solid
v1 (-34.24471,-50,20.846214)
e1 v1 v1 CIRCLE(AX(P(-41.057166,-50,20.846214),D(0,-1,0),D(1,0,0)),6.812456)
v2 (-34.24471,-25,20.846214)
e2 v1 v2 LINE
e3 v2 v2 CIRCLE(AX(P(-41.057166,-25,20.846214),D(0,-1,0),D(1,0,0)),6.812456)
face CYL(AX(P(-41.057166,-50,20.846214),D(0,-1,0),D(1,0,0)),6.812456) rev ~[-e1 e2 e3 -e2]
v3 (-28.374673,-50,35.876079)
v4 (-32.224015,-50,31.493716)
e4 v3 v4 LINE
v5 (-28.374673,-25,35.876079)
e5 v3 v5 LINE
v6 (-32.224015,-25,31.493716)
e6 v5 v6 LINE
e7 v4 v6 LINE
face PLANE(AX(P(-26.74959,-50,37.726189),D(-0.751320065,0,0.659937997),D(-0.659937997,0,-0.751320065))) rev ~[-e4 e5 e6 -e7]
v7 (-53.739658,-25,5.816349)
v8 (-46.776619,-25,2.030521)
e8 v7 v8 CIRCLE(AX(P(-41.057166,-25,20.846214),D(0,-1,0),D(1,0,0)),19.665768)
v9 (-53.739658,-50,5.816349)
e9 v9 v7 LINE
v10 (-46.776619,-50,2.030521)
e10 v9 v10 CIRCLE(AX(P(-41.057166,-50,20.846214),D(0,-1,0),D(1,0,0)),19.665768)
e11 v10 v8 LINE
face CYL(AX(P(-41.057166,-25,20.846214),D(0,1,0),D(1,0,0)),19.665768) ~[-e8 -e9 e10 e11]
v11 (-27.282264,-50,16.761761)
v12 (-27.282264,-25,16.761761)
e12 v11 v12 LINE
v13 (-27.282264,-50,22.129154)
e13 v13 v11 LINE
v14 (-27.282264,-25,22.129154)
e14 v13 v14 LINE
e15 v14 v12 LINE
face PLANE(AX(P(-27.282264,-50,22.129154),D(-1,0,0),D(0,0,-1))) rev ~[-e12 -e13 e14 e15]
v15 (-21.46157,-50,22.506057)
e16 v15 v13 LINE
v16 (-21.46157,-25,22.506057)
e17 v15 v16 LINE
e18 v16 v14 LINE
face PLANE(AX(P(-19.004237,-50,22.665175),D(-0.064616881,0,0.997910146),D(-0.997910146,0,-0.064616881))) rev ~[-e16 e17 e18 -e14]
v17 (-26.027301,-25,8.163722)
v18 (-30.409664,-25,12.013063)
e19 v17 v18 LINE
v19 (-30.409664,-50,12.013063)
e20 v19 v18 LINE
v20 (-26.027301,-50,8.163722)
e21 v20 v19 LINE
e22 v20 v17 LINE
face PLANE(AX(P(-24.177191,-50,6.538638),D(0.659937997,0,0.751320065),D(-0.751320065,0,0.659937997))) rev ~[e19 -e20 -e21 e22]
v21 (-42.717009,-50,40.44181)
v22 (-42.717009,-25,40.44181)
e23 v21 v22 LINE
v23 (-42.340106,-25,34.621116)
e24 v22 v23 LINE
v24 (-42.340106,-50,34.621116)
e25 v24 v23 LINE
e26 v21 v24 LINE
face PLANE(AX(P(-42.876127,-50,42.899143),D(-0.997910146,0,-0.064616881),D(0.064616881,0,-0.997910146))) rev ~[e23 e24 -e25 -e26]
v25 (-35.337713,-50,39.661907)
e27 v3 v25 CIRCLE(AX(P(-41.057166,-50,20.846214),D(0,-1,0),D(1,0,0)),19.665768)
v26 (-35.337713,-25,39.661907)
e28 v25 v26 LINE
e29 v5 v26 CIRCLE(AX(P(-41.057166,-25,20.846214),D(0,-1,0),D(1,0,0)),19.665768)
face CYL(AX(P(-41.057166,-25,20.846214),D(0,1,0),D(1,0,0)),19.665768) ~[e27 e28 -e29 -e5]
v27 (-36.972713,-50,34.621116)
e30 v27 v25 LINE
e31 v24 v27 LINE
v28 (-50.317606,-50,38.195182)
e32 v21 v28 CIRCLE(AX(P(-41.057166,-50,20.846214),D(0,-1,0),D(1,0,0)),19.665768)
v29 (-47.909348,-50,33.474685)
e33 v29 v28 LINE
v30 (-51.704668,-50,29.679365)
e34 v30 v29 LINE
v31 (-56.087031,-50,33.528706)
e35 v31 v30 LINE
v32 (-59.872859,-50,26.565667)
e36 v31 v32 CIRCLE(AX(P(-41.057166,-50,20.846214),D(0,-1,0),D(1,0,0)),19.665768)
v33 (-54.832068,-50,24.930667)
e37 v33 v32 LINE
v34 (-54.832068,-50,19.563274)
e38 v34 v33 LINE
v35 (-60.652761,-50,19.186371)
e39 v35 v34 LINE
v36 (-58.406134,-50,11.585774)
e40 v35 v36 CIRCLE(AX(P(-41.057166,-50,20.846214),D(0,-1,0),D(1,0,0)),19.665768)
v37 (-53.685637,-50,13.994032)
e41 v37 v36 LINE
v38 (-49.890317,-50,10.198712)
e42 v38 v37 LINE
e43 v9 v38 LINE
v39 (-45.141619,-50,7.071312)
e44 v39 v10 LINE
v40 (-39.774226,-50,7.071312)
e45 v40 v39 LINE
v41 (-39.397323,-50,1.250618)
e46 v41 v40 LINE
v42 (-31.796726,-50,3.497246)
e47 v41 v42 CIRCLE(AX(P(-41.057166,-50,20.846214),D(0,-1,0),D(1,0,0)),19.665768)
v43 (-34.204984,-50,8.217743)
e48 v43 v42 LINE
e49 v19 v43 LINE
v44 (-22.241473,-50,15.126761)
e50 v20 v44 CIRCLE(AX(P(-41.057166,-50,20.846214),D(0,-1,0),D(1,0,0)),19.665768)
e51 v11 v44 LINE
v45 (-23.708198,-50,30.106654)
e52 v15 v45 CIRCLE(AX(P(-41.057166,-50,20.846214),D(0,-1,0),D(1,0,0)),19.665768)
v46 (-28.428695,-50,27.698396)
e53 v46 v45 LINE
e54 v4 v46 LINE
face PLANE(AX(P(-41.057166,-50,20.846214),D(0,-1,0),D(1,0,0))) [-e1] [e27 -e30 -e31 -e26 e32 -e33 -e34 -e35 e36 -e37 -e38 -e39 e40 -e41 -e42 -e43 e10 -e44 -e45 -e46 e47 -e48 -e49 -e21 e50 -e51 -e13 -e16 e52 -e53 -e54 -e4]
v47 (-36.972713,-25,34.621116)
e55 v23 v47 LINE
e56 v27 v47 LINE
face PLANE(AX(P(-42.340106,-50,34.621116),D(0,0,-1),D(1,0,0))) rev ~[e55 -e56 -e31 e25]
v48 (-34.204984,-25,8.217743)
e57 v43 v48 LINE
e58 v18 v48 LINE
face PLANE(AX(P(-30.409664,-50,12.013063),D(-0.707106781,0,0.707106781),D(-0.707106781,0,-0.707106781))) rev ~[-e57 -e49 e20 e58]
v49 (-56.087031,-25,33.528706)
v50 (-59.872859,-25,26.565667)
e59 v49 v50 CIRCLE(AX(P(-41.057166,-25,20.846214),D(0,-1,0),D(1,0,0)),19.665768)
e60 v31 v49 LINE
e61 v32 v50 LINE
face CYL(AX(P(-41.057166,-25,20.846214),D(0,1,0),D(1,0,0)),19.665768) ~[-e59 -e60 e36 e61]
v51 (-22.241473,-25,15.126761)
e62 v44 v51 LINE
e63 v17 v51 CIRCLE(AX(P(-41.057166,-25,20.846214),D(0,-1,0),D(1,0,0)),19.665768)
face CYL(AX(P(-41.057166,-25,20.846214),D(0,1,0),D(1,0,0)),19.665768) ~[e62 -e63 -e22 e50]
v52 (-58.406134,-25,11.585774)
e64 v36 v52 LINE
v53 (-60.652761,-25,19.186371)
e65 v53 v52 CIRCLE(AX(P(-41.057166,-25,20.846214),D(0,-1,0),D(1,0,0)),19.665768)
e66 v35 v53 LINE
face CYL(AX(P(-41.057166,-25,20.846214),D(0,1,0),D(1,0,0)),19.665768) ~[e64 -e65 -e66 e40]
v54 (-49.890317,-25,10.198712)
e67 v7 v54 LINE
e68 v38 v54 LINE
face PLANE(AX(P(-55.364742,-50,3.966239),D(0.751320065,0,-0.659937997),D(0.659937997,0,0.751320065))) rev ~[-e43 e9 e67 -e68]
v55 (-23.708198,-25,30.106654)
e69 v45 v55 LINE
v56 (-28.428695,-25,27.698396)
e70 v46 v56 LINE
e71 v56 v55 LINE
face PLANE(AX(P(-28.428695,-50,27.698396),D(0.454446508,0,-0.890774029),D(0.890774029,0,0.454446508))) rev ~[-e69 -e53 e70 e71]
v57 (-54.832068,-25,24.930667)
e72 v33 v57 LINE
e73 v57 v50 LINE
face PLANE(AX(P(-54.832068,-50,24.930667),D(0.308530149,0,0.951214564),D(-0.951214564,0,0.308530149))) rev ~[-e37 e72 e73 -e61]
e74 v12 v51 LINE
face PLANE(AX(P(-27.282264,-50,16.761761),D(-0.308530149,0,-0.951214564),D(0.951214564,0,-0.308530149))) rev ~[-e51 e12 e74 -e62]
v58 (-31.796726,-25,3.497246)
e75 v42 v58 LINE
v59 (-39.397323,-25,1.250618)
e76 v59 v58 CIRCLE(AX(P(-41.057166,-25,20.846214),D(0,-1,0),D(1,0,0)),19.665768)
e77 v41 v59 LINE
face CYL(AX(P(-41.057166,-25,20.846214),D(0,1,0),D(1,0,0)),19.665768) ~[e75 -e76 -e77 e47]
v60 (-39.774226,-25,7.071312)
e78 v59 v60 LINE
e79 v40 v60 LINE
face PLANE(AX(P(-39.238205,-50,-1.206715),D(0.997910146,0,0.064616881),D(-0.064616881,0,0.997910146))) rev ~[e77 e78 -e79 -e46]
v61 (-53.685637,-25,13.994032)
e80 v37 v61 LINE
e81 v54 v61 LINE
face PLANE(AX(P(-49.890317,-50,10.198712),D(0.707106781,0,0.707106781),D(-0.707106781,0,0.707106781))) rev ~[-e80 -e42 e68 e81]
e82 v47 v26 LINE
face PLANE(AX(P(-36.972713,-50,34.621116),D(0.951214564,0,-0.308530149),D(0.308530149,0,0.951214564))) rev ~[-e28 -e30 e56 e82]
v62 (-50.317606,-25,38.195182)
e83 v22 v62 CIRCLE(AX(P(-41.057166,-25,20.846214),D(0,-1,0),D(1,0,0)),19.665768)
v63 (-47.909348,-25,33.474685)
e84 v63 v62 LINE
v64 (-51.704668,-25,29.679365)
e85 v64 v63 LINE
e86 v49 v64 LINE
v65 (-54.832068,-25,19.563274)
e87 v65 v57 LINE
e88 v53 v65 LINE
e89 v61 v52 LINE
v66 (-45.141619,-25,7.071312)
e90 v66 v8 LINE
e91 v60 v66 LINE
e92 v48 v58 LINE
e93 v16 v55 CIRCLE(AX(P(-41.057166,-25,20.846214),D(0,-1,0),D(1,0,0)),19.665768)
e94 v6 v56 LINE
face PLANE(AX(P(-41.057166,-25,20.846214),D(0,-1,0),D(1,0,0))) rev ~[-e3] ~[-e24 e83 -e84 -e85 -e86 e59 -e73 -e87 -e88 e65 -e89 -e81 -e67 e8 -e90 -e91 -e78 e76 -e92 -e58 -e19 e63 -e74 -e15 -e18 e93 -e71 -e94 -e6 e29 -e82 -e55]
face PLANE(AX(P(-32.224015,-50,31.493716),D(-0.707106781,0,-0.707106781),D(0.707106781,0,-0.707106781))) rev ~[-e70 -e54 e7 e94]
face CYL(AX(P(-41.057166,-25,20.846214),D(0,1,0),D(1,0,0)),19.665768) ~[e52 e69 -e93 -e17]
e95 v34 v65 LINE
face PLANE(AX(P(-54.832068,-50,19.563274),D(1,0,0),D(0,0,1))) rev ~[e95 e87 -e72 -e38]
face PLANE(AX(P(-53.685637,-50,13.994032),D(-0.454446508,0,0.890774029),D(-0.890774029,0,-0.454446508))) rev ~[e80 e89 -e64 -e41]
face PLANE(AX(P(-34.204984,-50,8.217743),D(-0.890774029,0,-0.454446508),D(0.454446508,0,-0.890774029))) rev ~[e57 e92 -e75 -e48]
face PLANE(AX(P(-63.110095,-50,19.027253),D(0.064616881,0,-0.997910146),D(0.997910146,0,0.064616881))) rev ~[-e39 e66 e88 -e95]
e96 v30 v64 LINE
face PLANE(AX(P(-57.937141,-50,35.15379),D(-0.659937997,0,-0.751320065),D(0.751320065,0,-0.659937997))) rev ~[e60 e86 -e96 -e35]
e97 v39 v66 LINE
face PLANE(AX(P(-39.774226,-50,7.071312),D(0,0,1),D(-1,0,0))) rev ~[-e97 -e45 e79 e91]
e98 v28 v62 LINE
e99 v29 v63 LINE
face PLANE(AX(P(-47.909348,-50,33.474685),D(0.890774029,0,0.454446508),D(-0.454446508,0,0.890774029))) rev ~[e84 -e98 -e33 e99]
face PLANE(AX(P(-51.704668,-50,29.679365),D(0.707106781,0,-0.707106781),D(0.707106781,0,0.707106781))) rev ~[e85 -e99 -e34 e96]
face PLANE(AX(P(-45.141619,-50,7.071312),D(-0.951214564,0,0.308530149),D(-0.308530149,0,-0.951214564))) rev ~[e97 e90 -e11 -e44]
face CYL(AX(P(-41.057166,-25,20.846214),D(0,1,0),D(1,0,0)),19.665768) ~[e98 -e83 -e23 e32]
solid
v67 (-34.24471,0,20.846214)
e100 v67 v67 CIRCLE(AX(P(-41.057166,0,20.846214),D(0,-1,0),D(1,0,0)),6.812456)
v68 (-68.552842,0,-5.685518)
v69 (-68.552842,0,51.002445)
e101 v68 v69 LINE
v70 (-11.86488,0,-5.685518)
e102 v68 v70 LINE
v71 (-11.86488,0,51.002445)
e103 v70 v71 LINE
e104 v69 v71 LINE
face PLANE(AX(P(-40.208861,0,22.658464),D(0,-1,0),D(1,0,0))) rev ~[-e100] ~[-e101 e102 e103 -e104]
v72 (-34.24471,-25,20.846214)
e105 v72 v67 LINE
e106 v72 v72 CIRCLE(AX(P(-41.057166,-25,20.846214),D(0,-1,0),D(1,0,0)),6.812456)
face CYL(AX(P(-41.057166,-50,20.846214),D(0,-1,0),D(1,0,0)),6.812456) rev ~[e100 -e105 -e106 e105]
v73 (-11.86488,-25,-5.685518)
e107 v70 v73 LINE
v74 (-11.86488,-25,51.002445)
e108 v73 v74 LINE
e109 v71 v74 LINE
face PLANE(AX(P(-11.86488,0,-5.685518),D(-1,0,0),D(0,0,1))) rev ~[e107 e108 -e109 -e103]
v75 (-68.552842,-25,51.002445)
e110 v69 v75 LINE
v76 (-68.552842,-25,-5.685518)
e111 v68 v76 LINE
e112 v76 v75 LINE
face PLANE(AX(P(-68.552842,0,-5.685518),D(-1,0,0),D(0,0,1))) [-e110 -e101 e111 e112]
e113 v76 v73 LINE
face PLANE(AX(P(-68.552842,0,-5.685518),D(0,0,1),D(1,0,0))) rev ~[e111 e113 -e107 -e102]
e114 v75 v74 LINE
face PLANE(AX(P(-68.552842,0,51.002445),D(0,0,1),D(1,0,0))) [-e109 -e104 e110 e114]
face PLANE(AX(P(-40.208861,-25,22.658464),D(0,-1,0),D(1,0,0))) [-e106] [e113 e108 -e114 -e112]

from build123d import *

# Parameters (mm, degrees)
F0_W            = 56.6879622638
F0_H            = 56.6879622638
F1_DEPTH        = 25
F2_R            = 19.6657684011
F3_DEPTH        = 25
F4_R            = 6.8124557353
F5_DEPTH        = 50.001
F7_DEPTH        = 50.001
F7_COPIES_COUNT = 8


# Not quite as in the source:
# - a pattern or mirror of a feature is missing from the dataset's text; its kind, count and spacing are read off the source's solid


with BuildPart() as f1:
    # F0 (on Front) → F1 (new body)
    with BuildSketch(Plane.XZ):
        with Locations((-40.2088612318, 22.6584635675)):
            Rectangle(F0_W, F0_H)
    extrude(amount=F1_DEPTH)


with BuildPart() as f3:
    # F2 (on face) → F3 (new body)
    with BuildSketch(Plane.XZ.offset(25)):
        with Locations((-41.0571657121, 20.8462141454)):
            Circle(F2_R)
    extrude(amount=F3_DEPTH)


with BuildPart() as f5_tool:
    # F4 (on face) → F5 (new body, through all)
    with BuildSketch(Plane.XZ.offset(50)):
        with Locations((-41.0571657121, 20.8462141454)):
            Circle(F4_R)
    extrude(amount=-F5_DEPTH)


with BuildPart() as f1_1:
    add(f1.part)

    # F5: cut by f5_tool
    add(f5_tool.part, mode=Mode.SUBTRACT)


with BuildPart() as f3_1:
    add(f3.part)

    # F5: cut by f5_tool
    add(f5_tool.part, mode=Mode.SUBTRACT)

    # F6 (on face) → F7 (cut, through all)
    with BuildSketch(Plane.XZ.offset(50)):
        Polygon((-19.0042369068, 22.665174678), (-27.28226409, 22.1291541798), (-27.28226409, 16.7617611587), (-19.8002401739, 14.3349375576), align=None)
    f7 = extrude(amount=-F7_DEPTH, mode=Mode.SUBTRACT)

    # F7_copies: F7 ×8 about axis
    f7_copies_axis = Axis((-41.057166, 0, 20.846214), (0, 1, 0))
    for i in range(1, F7_COPIES_COUNT):
        add(f7.rotate(f7_copies_axis, i * 360 / F7_COPIES_COUNT), mode=Mode.SUBTRACT)


solid = Compound([f1_1.part, f3_1.part])
